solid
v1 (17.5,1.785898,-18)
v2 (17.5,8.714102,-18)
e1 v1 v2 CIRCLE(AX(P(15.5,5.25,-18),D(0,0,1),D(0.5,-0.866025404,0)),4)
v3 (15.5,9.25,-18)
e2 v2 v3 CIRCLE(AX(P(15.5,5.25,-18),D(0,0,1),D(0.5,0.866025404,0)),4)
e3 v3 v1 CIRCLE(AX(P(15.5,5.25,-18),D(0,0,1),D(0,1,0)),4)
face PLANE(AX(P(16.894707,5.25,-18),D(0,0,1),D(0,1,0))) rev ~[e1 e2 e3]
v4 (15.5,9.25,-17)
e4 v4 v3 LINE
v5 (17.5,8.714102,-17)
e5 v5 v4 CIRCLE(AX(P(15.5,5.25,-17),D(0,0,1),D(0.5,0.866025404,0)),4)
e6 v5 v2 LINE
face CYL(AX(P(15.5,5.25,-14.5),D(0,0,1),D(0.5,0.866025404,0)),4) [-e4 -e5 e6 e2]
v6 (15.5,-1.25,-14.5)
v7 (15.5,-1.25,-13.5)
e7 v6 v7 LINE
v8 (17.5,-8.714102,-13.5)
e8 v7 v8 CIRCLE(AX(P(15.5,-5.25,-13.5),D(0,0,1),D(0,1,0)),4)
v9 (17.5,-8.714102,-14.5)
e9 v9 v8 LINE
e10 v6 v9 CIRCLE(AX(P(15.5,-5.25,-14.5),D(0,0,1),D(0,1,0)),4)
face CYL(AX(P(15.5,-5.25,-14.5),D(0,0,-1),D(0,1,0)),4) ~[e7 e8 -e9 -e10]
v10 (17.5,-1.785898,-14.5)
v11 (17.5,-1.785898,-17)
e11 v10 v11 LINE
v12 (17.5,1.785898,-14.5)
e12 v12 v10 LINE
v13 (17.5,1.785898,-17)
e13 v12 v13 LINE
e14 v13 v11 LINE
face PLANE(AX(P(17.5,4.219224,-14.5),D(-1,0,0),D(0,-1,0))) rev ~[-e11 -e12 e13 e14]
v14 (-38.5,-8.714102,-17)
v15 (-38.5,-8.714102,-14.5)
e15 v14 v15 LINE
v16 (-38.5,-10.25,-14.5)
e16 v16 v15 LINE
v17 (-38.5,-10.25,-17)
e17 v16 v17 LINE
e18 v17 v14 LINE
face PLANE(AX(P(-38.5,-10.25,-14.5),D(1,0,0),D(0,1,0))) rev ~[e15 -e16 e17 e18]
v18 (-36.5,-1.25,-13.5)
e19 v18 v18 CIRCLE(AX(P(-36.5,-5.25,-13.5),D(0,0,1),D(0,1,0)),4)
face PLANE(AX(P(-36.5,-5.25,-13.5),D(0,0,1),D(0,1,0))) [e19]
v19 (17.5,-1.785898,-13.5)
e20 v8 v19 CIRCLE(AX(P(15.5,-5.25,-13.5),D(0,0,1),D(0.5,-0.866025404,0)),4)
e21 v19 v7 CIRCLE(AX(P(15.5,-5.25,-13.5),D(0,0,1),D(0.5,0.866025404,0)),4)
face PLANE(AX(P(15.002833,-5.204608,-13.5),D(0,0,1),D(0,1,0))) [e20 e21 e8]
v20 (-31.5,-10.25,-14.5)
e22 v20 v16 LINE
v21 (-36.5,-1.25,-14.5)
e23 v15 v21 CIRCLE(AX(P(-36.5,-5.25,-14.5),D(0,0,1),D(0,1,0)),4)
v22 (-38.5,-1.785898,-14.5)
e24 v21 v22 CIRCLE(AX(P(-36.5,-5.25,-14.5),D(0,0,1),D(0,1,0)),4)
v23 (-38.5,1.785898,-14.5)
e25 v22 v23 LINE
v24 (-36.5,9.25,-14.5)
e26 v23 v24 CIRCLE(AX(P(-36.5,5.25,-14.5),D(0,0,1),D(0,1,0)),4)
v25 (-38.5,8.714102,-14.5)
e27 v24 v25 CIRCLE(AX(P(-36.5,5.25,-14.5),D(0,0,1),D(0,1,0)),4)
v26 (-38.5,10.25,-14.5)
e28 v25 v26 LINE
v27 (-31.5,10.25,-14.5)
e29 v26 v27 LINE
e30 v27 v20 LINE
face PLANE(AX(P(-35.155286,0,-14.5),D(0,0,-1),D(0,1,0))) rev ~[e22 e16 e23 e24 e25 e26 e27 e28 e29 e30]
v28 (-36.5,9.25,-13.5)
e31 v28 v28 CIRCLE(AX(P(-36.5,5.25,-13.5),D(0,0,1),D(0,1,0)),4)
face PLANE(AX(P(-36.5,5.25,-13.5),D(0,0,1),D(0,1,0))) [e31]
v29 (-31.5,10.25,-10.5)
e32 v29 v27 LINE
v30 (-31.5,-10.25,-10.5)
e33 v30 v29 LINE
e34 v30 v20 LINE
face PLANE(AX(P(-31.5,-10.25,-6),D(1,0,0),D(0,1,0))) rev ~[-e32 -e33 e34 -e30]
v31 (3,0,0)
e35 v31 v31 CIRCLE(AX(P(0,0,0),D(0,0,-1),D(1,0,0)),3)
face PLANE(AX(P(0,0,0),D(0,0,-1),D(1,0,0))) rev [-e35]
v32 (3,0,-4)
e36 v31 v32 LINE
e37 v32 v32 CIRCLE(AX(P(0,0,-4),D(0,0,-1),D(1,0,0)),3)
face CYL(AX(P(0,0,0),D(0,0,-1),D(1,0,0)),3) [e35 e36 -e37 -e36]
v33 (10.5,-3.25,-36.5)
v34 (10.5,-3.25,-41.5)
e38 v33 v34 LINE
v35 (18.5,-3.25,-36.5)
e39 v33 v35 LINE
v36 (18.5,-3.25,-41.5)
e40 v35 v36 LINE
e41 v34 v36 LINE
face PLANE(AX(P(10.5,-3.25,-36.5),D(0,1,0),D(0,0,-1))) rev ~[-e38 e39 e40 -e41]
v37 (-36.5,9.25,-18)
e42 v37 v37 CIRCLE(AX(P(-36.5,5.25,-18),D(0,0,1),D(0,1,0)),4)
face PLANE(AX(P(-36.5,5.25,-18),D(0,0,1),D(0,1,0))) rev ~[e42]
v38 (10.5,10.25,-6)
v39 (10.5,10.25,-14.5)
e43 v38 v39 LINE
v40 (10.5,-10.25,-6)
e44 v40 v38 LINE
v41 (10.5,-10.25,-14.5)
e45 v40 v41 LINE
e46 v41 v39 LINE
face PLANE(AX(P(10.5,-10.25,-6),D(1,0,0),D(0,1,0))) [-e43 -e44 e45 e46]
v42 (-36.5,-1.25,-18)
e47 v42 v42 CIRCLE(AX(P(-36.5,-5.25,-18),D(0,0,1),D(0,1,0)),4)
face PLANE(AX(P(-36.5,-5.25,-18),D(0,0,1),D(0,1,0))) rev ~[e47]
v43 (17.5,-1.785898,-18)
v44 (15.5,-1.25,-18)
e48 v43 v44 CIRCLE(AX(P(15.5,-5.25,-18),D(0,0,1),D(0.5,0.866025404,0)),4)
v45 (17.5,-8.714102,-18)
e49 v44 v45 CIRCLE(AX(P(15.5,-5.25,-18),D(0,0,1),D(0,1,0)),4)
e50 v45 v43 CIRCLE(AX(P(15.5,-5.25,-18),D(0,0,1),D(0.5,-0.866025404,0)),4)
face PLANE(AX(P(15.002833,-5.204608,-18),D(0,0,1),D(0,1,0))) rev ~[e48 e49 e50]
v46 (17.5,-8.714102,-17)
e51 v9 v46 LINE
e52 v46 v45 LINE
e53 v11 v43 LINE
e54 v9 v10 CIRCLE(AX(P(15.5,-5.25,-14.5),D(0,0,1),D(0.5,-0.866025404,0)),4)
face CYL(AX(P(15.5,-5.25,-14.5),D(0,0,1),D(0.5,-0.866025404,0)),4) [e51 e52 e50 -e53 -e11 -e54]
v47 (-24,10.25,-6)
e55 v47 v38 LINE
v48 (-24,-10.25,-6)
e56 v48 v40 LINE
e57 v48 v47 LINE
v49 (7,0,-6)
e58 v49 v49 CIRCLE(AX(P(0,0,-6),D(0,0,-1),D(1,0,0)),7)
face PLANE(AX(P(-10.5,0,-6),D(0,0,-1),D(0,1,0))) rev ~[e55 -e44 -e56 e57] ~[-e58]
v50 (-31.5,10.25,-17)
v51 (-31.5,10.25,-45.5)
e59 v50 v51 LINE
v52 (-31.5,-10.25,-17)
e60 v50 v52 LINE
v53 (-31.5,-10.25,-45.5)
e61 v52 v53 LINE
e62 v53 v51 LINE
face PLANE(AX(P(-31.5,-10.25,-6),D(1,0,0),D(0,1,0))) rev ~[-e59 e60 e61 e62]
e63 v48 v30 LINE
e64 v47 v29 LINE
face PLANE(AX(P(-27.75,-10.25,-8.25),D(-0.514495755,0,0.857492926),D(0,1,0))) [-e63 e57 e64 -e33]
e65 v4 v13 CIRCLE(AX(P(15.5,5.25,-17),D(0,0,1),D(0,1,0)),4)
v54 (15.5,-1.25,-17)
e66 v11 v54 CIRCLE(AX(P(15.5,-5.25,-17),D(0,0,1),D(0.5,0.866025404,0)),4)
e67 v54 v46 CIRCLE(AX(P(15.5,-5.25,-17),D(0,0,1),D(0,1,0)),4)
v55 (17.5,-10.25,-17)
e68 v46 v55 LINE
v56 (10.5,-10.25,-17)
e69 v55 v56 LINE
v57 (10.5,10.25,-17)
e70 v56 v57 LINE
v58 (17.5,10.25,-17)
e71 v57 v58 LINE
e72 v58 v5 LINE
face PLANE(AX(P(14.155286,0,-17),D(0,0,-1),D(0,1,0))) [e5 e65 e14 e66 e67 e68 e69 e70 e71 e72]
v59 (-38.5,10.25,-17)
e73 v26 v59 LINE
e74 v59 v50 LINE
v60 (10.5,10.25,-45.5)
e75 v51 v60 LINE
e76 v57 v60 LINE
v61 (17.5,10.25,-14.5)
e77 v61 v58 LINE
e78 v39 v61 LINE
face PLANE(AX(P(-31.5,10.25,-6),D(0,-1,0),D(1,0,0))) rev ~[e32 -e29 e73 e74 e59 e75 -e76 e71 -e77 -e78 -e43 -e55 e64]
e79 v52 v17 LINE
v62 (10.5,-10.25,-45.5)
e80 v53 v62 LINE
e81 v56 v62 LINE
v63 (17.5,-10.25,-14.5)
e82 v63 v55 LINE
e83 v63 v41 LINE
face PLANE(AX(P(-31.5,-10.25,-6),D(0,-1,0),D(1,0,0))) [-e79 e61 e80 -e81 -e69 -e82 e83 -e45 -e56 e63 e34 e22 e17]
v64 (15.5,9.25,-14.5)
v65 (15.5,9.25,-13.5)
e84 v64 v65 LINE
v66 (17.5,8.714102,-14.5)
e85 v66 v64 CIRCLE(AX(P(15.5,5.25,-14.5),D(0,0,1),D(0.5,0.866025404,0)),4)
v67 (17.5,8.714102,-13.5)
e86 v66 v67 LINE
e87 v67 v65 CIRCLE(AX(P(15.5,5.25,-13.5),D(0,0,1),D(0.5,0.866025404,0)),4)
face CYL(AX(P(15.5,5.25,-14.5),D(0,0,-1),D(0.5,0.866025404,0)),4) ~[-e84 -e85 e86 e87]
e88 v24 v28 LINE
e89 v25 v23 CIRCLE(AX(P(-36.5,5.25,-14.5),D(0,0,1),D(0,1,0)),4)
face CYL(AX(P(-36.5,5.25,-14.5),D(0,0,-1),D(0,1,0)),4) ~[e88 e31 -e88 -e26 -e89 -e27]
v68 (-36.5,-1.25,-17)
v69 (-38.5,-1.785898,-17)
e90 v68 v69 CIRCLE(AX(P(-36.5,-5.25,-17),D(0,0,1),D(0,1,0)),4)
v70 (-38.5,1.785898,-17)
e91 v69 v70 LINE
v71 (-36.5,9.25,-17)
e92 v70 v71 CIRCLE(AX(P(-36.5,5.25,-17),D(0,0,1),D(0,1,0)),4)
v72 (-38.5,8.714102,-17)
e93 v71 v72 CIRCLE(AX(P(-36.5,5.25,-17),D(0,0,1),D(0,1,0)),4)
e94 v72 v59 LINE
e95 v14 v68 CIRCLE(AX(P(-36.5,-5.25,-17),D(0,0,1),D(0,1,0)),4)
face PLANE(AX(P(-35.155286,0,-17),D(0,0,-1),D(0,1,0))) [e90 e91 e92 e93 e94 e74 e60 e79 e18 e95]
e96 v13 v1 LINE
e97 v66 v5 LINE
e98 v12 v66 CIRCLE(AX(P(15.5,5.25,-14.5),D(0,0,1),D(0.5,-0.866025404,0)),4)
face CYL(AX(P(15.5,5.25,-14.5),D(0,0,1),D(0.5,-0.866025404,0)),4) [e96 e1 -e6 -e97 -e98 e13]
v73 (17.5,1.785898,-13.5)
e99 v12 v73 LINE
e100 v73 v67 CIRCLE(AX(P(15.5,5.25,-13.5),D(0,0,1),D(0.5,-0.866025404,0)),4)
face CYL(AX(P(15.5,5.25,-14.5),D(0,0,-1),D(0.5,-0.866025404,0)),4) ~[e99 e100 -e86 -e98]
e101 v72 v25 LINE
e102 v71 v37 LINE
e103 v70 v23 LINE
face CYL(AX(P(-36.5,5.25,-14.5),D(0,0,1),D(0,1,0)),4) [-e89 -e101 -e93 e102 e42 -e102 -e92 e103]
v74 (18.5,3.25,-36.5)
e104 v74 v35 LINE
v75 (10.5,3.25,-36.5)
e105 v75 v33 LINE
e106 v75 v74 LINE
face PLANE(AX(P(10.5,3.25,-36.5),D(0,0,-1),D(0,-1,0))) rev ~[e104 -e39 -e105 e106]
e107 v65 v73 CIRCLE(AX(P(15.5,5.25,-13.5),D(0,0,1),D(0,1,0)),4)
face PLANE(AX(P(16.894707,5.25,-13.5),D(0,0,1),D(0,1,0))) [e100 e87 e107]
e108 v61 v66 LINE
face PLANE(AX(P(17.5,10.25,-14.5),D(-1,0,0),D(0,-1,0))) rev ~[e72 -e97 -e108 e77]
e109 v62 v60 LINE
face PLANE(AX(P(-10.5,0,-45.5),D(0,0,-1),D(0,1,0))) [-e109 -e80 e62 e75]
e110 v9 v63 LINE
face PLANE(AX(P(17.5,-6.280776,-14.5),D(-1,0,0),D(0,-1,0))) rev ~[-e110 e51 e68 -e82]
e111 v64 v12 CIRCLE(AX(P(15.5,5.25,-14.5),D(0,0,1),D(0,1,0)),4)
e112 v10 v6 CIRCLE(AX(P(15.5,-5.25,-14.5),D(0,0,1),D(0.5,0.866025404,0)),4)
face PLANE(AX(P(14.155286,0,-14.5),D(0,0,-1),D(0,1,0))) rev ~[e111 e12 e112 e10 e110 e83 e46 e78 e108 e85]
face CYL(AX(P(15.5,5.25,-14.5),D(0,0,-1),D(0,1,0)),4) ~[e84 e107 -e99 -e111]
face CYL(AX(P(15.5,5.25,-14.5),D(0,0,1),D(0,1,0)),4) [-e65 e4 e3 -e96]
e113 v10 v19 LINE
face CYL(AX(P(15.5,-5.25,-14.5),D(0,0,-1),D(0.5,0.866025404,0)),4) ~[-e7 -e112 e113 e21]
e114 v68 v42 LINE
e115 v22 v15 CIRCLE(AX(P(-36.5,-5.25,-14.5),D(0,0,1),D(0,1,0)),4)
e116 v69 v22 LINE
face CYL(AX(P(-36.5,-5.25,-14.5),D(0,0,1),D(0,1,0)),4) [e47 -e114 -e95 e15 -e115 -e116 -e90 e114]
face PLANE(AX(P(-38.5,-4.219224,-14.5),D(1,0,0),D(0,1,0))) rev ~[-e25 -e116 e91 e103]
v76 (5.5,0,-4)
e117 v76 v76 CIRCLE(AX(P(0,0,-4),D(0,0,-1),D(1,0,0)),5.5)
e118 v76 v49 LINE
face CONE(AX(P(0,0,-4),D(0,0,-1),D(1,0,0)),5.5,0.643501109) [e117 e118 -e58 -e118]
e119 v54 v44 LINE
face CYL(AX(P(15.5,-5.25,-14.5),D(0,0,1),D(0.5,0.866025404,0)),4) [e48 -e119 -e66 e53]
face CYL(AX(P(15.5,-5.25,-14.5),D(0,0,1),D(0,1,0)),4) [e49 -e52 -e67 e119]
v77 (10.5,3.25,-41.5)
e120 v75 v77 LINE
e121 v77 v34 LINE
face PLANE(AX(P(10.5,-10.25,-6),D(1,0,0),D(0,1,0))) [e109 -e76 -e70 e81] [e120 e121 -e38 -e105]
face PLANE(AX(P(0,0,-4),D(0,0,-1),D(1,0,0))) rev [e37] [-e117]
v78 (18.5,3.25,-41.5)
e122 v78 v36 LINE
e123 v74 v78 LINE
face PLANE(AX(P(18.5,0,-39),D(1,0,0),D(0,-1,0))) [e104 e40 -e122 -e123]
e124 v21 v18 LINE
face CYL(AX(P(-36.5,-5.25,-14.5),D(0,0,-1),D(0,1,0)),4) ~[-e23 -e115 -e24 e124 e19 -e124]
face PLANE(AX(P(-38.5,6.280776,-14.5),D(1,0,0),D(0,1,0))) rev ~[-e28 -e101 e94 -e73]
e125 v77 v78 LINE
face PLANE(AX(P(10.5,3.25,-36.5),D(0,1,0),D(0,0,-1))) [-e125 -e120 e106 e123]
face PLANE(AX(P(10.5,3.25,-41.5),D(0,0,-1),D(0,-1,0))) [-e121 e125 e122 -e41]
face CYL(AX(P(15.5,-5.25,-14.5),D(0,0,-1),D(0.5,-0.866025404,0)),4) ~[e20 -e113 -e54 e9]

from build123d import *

# Parameters (mm, degrees)
F0_W          = 20.5
F0_H          = 42
F1_DEPTH      = 39.5
F2_START      = 8.5
F2_DEPTH      = 2.5
F5_W          = 6.5
F5_H          = 5
F6_DEPTH      = 8
F7_SIZE2      = 4.5
F7_SIZE       = 7.5
F8_R          = 4
F9_DEPTH      = 1
F9_DEPTH_BACK = 3.5
F10_ANGLE     = 180
F12_ANGLE     = -90


# Not quite as in the source:
# - a feature names something its author has since deleted; it is built from what else it names


with BuildPart() as f1:
    # F0 (on Top) → F1 (new body)
    with BuildSketch(Plane.XY):
        with Locations((0, -10.5)):
            Rectangle(F0_W, F0_H)
    extrude(amount=F1_DEPTH)

    # F0 (on Top) → F2 (join)
    with BuildSketch(Plane.XY.offset(F2_START)):
        with BuildLine():
            Line((-10.25, 10.5), (10.25, 10.5))
            Line((10.25, 10.5), (10.25, 17.5))
            Line((10.25, 17.5), (6.2807764064, 17.5))
            ThreePointArc((6.2807764064, 17.5), (5.25, 13.25), (4.2192235936, 17.5))
            Line((4.2192235936, 17.5), (-4.2192235936, 17.5))
            ThreePointArc((-4.2192235936, 17.5), (-5.25, 13.25), (-6.2807764064, 17.5))
            Line((-6.2807764064, 17.5), (-10.25, 17.5))
            Line((-10.25, 17.5), (-10.25, 10.5))
        make_face()
        with BuildLine():
            Line((10.25, -38.5), (10.25, -31.5))
            Line((10.25, -31.5), (-10.25, -31.5))
            Line((-10.25, -31.5), (-10.25, -38.5))
            Line((-10.25, -38.5), (-6.2807764064, -38.5))
            ThreePointArc((-6.2807764064, -38.5), (-5.25, -34.25), (-4.2192235936, -38.5))
            Line((-4.2192235936, -38.5), (4.2192235936, -38.5))
            ThreePointArc((4.2192235936, -38.5), (5.25, -34.25), (6.2807764064, -38.5))
            Line((6.2807764064, -38.5), (10.25, -38.5))
        make_face()
    extrude(amount=F2_DEPTH)

    # F3 (on Right) → F4 (revolve)
    with BuildSketch(Plane.YZ):
        Polygon((5.5, -2), (7, 0), (0, 0), (0, -6), (3, -6), (3, -2), align=None)
    revolve(axis=Axis((0, 0, -3), (0, 0, 1)))

    # F5 (on face) → F6 (join)
    with BuildSketch(Plane(origin=(0, 10.5, 0), x_dir=(-1, 0, 0), z_dir=(0, 1, 0))):
        with Locations((0, 33)):
            Rectangle(F5_W, F5_H)
    extrude(amount=F6_DEPTH)

    # F7
    f7_edges = [f1.edges().sort_by_distance(p)[0] for p in [
        (0, -31.5, 0),
    ]]
    f7_side = f1.faces().sort_by_distance((0, -12.786008, 0))[0]
    chamfer(f7_edges, length=F7_SIZE, length2=F7_SIZE2, reference=f7_side)

    # F8 (on face) → F9 (join, two sides)
    with BuildSketch(Plane(origin=(0, 0, 8.5), x_dir=(1, 0, 0), z_dir=(0, 0, -1))) as f9_sk:
        with Locations((-5.25, 36.5)):
            Circle(F8_R)
        with Locations((5.25, 36.5)):
            Circle(F8_R)
        with BuildLine():
            Line((4.2192235936, -17.5), (1.7858983849, -17.5))
            ThreePointArc((1.7858983849, -17.5), (5.25, -19.5), (8.7141016151, -17.5))
            Line((8.7141016151, -17.5), (6.2807764064, -17.5))
            ThreePointArc((6.2807764064, -17.5), (5.25, -13.25), (4.2192235936, -17.5))
        make_face()
        with BuildLine():
            Line((-8.7141016151, -17.5), (-6.2807764064, -17.5))
            ThreePointArc((-6.2807764064, -17.5), (-5.25, -13.25), (-4.2192235936, -17.5))
            Line((-4.2192235936, -17.5), (-1.7858983849, -17.5))
            ThreePointArc((-1.7858983849, -17.5), (-1.3862966948, -16.5352761804), (-1.25, -15.5))
            ThreePointArc((-1.25, -15.5), (-6.2852761804, -11.6362966948), (-8.7141016151, -17.5))
        make_face()
        with BuildLine():
            ThreePointArc((-4.2192235936, -17.5), (-5.25, -13.25), (-6.2807764064, -17.5))
            Line((-6.2807764064, -17.5), (-8.7141016151, -17.5))
            ThreePointArc((-8.7141016151, -17.5), (-5.25, -19.5), (-1.7858983849, -17.5))
            Line((-1.7858983849, -17.5), (-4.2192235936, -17.5))
        make_face()
        with BuildLine():
            ThreePointArc((9.25, -15.5), (4.2147238196, -11.6362966948), (1.7858983849, -17.5))
            Line((1.7858983849, -17.5), (4.2192235936, -17.5))
            ThreePointArc((4.2192235936, -17.5), (5.25, -13.25), (6.2807764064, -17.5))
            Line((6.2807764064, -17.5), (8.7141016151, -17.5))
            ThreePointArc((8.7141016151, -17.5), (9.1137033052, -16.5352761804), (9.25, -15.5))
        make_face()
    extrude(amount=F9_DEPTH)
    extrude(f9_sk.sketch, amount=-F9_DEPTH_BACK)


with BuildPart() as f1_1:
    # F10: moved
    add(f1.part.rotate(Axis((0, 5.25, 0), (0, 1, 0)), F10_ANGLE))


with BuildPart() as f1_2:
    # F11: moved
    add(f1_1.part.moved(Location((0, 0, -6))))


with BuildPart() as f1_3:
    # F12: moved
    add(f1_2.part.rotate(Axis((0, 0, -3), (0, 0, 1)), F12_ANGLE))


solid = f1_3.part
